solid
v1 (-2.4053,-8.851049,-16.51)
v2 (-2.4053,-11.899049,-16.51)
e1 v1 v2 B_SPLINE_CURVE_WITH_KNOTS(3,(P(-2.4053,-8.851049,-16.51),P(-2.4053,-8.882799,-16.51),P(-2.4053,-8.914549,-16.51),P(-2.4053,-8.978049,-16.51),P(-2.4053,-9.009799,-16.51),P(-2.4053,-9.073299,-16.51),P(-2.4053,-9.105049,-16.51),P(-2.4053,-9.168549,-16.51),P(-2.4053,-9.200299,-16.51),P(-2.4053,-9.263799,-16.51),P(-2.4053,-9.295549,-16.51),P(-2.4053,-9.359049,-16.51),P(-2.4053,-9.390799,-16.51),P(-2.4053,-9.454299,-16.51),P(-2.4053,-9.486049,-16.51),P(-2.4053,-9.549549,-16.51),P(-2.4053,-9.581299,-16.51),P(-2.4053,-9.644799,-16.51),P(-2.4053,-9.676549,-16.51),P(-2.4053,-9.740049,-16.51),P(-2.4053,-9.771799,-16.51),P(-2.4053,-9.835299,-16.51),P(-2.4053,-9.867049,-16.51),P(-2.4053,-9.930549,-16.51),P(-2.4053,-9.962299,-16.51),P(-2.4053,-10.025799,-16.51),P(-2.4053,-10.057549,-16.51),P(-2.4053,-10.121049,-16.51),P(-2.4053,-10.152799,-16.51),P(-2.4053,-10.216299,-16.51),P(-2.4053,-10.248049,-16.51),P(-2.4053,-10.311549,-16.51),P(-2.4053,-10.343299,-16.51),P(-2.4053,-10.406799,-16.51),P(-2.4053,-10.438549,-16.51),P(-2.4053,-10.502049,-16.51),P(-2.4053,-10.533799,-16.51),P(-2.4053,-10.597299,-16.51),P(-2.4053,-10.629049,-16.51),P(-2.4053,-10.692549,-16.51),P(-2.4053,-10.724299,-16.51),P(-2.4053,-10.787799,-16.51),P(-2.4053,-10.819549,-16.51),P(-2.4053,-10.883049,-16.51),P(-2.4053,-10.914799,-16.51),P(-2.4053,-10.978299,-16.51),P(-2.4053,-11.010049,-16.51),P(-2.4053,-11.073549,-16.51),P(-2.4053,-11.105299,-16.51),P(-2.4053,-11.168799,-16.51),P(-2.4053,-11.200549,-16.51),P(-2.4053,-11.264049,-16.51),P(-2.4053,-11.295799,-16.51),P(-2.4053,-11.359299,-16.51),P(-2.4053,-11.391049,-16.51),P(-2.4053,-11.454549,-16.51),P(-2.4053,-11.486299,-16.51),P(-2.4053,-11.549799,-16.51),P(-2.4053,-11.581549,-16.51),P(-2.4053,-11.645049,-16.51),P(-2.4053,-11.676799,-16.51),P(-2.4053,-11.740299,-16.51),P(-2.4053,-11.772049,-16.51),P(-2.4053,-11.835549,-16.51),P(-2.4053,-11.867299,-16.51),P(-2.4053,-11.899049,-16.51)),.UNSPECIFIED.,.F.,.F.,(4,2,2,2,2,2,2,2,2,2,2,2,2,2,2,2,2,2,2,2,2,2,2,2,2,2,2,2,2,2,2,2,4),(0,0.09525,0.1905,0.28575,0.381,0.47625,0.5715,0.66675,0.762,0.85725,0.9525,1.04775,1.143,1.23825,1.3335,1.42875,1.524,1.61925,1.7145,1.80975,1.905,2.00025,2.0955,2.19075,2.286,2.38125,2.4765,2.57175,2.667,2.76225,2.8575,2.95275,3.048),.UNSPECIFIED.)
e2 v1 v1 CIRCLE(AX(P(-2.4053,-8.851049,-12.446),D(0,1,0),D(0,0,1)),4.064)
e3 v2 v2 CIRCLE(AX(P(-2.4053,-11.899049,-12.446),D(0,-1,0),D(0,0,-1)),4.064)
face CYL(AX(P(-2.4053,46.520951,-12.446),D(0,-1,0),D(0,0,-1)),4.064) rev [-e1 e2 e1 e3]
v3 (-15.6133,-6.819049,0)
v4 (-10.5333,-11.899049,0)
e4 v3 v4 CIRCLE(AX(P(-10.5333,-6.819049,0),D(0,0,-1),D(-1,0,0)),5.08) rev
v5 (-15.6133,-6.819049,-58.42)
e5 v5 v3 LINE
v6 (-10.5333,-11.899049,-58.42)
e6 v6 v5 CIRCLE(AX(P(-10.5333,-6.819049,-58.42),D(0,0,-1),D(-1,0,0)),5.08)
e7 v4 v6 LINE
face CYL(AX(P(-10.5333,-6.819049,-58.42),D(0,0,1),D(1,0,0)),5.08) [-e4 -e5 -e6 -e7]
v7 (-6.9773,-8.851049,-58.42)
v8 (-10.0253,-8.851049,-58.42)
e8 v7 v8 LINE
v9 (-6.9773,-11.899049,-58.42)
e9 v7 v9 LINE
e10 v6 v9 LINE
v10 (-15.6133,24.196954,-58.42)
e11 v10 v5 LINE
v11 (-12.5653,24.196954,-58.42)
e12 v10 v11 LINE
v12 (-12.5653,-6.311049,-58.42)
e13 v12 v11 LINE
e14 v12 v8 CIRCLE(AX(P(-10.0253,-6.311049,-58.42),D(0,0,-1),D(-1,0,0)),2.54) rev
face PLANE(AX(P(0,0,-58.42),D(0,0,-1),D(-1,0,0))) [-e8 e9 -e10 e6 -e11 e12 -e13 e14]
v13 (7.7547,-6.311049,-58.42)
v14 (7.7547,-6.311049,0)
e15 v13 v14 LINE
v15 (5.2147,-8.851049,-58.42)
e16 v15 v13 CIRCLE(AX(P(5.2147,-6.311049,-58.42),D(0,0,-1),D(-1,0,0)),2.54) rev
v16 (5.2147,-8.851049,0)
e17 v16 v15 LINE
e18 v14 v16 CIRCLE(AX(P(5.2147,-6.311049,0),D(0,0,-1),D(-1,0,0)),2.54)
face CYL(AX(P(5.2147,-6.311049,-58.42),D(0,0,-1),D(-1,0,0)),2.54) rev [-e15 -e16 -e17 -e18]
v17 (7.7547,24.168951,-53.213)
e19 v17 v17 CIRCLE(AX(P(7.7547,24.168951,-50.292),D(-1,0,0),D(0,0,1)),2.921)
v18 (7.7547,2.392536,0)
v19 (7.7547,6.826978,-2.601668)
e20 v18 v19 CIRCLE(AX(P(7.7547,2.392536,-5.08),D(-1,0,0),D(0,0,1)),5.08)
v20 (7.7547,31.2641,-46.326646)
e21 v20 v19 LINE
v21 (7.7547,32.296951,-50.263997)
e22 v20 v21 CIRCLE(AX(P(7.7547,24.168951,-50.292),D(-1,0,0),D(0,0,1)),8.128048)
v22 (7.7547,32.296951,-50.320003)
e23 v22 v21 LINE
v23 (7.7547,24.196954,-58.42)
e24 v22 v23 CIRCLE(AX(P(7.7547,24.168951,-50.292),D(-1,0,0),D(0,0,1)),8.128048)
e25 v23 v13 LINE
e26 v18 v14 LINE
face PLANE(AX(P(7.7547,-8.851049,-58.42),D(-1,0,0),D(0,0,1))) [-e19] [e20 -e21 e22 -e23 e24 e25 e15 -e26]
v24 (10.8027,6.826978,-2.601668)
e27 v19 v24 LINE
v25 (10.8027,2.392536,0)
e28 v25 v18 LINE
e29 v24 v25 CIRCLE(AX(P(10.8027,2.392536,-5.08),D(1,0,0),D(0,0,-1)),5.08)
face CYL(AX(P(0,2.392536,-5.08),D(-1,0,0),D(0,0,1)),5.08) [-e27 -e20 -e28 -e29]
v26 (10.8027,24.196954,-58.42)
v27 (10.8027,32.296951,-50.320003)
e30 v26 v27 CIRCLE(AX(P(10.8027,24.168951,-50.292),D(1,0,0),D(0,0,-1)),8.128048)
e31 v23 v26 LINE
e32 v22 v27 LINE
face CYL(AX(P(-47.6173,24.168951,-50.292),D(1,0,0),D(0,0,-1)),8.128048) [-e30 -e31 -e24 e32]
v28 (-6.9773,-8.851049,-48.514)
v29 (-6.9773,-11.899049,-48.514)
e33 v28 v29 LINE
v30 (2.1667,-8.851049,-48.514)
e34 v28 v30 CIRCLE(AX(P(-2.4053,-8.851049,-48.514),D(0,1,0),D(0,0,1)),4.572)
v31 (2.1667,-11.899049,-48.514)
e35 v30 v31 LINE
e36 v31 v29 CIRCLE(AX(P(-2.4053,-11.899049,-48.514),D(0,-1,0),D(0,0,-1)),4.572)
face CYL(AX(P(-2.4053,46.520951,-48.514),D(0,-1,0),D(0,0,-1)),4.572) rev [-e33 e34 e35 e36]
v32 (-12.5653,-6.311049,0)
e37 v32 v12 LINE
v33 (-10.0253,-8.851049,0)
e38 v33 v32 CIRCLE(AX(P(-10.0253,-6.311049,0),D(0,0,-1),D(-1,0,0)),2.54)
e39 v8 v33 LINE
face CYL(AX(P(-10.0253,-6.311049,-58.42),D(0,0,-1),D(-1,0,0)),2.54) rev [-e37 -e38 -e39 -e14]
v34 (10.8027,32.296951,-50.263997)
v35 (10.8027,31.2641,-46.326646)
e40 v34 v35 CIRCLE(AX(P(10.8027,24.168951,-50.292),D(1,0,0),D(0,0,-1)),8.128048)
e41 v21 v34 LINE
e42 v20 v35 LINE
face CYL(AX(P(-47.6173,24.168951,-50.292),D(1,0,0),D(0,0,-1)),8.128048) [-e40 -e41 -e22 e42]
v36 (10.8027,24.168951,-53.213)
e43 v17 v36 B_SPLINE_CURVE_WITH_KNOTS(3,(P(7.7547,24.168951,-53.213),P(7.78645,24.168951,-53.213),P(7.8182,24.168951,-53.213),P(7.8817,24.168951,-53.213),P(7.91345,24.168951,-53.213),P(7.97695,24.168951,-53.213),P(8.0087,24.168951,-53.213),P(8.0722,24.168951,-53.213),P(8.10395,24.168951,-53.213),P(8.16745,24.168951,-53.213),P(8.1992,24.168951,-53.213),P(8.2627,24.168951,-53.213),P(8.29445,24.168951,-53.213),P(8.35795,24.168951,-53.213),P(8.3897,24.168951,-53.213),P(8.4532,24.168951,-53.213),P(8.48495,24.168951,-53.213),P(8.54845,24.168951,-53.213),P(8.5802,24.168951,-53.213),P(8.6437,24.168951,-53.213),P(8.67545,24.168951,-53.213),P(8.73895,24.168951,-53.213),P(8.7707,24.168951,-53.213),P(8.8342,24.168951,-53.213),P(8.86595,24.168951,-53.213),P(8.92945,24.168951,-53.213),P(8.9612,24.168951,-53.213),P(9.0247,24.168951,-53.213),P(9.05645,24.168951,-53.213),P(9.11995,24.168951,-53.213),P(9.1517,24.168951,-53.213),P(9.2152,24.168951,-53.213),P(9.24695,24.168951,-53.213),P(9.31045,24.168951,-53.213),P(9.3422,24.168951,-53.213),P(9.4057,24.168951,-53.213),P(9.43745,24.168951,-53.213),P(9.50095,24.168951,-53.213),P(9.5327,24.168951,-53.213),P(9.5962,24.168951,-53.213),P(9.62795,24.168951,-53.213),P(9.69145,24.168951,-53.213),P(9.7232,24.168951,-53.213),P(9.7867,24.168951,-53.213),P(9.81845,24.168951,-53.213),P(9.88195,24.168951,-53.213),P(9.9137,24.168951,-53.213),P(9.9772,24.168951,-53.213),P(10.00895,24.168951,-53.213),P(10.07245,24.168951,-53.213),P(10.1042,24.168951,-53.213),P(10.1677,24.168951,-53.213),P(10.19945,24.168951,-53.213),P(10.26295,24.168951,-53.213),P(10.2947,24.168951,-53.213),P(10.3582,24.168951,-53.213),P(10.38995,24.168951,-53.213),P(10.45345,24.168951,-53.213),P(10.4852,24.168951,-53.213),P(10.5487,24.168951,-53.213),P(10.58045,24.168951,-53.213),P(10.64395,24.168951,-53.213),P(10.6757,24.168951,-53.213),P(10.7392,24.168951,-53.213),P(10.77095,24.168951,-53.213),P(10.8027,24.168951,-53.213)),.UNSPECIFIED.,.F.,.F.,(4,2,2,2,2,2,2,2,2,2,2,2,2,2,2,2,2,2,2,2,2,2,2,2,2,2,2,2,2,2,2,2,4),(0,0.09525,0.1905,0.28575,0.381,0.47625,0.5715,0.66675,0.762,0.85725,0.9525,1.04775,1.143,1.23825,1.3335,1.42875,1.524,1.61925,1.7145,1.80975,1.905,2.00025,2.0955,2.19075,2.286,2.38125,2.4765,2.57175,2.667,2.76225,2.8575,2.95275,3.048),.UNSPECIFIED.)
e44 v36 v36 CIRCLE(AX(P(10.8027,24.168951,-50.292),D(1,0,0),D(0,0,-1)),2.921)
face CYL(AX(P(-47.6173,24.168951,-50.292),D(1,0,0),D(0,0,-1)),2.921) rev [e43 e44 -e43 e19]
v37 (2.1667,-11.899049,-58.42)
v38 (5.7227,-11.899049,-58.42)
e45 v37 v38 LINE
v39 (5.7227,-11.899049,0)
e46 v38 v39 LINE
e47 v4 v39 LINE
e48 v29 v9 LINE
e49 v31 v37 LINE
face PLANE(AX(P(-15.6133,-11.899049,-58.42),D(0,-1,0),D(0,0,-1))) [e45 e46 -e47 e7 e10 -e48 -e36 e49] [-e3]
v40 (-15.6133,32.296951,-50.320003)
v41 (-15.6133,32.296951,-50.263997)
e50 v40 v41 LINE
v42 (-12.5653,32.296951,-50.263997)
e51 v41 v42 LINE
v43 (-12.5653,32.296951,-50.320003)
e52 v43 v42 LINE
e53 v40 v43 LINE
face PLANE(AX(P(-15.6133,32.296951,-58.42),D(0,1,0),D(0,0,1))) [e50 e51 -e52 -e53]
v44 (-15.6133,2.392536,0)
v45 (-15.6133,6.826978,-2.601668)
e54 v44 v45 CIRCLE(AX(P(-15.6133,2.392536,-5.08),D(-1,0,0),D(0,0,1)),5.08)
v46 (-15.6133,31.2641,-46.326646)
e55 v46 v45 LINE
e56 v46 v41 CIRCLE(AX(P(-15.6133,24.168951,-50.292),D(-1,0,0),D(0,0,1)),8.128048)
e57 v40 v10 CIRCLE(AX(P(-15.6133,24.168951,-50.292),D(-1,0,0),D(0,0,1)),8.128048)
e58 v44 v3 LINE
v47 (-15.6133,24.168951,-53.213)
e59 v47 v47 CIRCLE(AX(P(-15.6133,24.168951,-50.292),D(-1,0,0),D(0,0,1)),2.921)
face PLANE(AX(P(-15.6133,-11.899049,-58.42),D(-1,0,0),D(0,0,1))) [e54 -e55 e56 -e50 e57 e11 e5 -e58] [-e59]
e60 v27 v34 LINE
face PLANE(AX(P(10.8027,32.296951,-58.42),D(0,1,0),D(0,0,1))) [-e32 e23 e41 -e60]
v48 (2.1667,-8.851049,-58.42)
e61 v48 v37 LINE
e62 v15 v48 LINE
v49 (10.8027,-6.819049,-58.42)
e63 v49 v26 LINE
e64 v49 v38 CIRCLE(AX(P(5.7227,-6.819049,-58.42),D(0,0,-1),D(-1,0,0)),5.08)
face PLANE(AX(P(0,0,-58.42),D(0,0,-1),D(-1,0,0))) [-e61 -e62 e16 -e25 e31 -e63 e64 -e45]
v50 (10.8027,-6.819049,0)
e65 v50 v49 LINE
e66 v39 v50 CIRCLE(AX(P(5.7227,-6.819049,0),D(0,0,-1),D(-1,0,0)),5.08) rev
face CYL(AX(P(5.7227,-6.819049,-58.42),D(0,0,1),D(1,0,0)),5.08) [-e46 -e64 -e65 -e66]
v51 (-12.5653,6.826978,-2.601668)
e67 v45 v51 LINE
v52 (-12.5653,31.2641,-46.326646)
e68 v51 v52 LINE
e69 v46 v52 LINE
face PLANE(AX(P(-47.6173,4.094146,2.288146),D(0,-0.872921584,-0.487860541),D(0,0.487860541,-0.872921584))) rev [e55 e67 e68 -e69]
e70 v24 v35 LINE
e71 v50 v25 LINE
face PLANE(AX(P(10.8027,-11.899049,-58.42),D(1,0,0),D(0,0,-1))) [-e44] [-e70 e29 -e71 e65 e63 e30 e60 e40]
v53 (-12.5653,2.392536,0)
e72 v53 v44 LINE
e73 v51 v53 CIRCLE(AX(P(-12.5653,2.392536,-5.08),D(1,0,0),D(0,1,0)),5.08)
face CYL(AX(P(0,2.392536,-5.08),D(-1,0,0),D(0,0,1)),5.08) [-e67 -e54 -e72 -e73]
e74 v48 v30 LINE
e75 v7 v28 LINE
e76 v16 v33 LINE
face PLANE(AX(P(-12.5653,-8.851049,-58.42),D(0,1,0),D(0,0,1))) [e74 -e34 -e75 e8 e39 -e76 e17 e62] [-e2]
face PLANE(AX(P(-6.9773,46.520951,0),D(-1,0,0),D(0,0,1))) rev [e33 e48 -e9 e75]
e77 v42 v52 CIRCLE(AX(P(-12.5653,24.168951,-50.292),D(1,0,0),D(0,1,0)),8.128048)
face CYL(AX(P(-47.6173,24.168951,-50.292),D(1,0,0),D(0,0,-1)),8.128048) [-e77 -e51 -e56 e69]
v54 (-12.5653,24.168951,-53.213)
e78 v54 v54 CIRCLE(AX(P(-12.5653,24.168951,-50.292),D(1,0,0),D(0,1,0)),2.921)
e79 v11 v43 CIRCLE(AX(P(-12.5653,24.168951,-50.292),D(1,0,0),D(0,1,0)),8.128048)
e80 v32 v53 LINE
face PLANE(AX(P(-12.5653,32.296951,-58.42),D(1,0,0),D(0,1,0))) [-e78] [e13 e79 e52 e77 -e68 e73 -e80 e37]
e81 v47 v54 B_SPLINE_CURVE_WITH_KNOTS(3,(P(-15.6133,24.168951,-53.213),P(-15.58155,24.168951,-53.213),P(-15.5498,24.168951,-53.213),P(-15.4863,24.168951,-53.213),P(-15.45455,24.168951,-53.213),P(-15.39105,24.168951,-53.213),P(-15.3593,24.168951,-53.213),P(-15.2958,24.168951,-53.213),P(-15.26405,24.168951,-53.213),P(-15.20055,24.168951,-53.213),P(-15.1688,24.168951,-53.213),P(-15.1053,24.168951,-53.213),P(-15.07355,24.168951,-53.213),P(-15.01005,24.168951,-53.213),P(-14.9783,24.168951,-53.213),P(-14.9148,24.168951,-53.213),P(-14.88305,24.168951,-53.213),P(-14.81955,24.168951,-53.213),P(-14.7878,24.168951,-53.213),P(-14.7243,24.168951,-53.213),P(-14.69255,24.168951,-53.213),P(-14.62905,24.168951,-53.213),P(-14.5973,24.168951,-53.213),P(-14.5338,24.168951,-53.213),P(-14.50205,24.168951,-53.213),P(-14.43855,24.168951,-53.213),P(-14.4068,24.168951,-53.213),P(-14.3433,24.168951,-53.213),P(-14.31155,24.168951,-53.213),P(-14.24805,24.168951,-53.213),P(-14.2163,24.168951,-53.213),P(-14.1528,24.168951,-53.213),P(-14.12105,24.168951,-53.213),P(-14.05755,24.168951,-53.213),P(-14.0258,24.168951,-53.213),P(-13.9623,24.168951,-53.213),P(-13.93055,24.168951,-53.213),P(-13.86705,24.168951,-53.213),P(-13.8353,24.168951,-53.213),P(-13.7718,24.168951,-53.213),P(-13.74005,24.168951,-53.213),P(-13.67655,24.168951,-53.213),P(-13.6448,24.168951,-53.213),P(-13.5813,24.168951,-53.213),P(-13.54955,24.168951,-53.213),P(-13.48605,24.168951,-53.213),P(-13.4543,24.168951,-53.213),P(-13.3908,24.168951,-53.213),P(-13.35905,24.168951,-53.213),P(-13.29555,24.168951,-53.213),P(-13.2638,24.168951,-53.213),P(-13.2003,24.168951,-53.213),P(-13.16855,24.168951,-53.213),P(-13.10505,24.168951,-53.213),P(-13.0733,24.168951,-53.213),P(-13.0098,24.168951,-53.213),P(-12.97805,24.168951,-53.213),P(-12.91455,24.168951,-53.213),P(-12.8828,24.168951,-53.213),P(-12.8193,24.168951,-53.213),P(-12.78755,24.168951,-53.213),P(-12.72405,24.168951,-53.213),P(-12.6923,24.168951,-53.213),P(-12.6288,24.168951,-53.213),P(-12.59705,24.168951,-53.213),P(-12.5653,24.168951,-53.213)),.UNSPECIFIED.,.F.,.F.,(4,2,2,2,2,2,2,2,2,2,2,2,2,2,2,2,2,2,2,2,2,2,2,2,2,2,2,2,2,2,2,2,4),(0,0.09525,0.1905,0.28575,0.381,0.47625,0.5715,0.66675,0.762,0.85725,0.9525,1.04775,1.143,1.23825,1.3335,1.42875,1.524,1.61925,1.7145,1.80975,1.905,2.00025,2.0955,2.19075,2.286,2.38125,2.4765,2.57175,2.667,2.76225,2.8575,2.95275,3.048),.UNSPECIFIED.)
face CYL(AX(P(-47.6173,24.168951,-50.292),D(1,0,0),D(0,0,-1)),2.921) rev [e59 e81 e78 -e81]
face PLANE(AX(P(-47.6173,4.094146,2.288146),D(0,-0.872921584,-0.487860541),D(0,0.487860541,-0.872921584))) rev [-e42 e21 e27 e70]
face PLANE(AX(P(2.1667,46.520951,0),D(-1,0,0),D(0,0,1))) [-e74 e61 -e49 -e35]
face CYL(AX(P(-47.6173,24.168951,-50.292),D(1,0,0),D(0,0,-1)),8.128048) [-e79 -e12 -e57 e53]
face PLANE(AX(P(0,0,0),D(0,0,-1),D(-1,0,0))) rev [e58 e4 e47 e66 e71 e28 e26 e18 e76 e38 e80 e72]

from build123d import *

# Parameters (mm, degrees)
BOSS_EXTRUDE1_DEPTH = 58.42
FILLET1_R           = 2.54
FILLET2_R           = 5.08
CUT_EXTRUDE1_START  = -26.416
CUT_EXTRUDE1_DEPTH  = 26.416
CUT_EXTRUDE2_START  = -26.416
CUT_EXTRUDE2_DEPTH  = 26.416
SKETCH2_5_R         = 2.921
CUT_EXTRUDE3_DEPTH  = 58.42
FILLET3_R           = 5.08
SKETCH4_R           = 4.064
CUT_EXTRUDE4_DEPTH  = 58.42


# Read off the part's stored shape, not the designer's step: Cut-Extrude1, Cut-Extrude2
with BuildPart() as part:
    # Sketch1 → Boss-Extrude1 (new body)
    with BuildSketch(Plane.XY):
        Polygon((-15.613299977, -11.899049236), (10.802700023, -11.899049236), (10.802700023, 32.296950764), (7.754700023, 32.296950764), (7.754700023, -8.851049236), (-12.565299977, -8.851049236), (-12.565299977, 32.296950764), (-15.613299977, 32.296950764), align=None)
    extrude(amount=-BOSS_EXTRUDE1_DEPTH)

    # Fillet1
    fillet1_edges = [part.edges().sort_by_distance(p)[0] for p in [
        (-12.565299977, -8.851049236, -29.21),
        (7.754700023, -8.851049236, -29.21),
    ]]
    fillet(fillet1_edges, radius=FILLET1_R)

    # Fillet2
    fillet2_edges = [part.edges().sort_by_distance(p)[0] for p in [
        (10.802700023, -11.899049236, -29.21),
        (-15.613299977, -11.899049236, -29.21),
    ]]
    fillet(fillet2_edges, radius=FILLET2_R)

    # Cut-Extrude1 outline → Cut-Extrude1 (cut)
    with BuildSketch(Plane(origin=(10.802700023, 0, 0), x_dir=(0, 0, -1), z_dir=(1, 0, 0)).offset(CUT_EXTRUDE1_START)):
        with BuildLine():
            Line((0, 32.296950764), (0, 5.372950764))
            Line((0, 5.372950764), (46.326645987, 31.26409951))
            ThreePointArc((46.326645987, 31.26409951), (48.229617736, 32.030995509), (50.263996941, 32.296950764))
            Line((50.263996941, 32.296950764), (0, 32.296950764))
        make_face()
    extrude(amount=CUT_EXTRUDE1_DEPTH, mode=Mode.SUBTRACT)

    # Cut-Extrude2 outline → Cut-Extrude2 (cut)
    with BuildSketch(Plane(origin=(10.802700023, 0, 0), x_dir=(0, 0, -1), z_dir=(1, 0, 0)).offset(CUT_EXTRUDE2_START)):
        with BuildLine():
            ThreePointArc((50.320003059, 32.296950764), (56.039398027, 29.916348791), (58.42, 24.196953823))
            Line((58.42, 24.196953823), (58.42, 32.296950764))
            Line((58.42, 32.296950764), (50.320003059, 32.296950764))
        make_face()
    extrude(amount=CUT_EXTRUDE2_DEPTH, mode=Mode.SUBTRACT)

    # Sketch2<5> → Cut-Extrude3 (cut)
    with BuildSketch(Plane(origin=(10.802700023, 0, 0), x_dir=(0, 0, -1), z_dir=(1, 0, 0))):
        with Locations((50.292, 24.168950764)):
            Circle(SKETCH2_5_R)
    extrude(amount=-CUT_EXTRUDE3_DEPTH, mode=Mode.SUBTRACT)

    # Fillet3
    fillet3_edges = [part.edges().sort_by_distance(p)[0] for p in [
        (-14.089299977, 5.372950764, 0),
        (9.278700023, 5.372950764, 0),
    ]]
    fillet(fillet3_edges, radius=FILLET3_R)

    # Sketch4 → Cut-Extrude4 (cut)
    with BuildSketch(Plane(origin=(0, -11.899049236, 0), x_dir=(-1, 0, 0), z_dir=(0, -1, 0))):
        with Locations(Location((2.405299977, 12.446, 0), (0, 0, 90))):
            Circle(SKETCH4_R)
        with BuildLine():
            ThreePointArc((-2.166700023, 48.514), (2.405299977, 43.942), (6.977299977, 48.514))
            Line((6.977299977, 48.514), (6.977299977, 58.42))
            Line((6.977299977, 58.42), (-2.166700023, 58.42))
            Line((-2.166700023, 58.42), (-2.166700023, 48.514))
        make_face()
    extrude(amount=-CUT_EXTRUDE4_DEPTH, mode=Mode.SUBTRACT)


solid = part.part
